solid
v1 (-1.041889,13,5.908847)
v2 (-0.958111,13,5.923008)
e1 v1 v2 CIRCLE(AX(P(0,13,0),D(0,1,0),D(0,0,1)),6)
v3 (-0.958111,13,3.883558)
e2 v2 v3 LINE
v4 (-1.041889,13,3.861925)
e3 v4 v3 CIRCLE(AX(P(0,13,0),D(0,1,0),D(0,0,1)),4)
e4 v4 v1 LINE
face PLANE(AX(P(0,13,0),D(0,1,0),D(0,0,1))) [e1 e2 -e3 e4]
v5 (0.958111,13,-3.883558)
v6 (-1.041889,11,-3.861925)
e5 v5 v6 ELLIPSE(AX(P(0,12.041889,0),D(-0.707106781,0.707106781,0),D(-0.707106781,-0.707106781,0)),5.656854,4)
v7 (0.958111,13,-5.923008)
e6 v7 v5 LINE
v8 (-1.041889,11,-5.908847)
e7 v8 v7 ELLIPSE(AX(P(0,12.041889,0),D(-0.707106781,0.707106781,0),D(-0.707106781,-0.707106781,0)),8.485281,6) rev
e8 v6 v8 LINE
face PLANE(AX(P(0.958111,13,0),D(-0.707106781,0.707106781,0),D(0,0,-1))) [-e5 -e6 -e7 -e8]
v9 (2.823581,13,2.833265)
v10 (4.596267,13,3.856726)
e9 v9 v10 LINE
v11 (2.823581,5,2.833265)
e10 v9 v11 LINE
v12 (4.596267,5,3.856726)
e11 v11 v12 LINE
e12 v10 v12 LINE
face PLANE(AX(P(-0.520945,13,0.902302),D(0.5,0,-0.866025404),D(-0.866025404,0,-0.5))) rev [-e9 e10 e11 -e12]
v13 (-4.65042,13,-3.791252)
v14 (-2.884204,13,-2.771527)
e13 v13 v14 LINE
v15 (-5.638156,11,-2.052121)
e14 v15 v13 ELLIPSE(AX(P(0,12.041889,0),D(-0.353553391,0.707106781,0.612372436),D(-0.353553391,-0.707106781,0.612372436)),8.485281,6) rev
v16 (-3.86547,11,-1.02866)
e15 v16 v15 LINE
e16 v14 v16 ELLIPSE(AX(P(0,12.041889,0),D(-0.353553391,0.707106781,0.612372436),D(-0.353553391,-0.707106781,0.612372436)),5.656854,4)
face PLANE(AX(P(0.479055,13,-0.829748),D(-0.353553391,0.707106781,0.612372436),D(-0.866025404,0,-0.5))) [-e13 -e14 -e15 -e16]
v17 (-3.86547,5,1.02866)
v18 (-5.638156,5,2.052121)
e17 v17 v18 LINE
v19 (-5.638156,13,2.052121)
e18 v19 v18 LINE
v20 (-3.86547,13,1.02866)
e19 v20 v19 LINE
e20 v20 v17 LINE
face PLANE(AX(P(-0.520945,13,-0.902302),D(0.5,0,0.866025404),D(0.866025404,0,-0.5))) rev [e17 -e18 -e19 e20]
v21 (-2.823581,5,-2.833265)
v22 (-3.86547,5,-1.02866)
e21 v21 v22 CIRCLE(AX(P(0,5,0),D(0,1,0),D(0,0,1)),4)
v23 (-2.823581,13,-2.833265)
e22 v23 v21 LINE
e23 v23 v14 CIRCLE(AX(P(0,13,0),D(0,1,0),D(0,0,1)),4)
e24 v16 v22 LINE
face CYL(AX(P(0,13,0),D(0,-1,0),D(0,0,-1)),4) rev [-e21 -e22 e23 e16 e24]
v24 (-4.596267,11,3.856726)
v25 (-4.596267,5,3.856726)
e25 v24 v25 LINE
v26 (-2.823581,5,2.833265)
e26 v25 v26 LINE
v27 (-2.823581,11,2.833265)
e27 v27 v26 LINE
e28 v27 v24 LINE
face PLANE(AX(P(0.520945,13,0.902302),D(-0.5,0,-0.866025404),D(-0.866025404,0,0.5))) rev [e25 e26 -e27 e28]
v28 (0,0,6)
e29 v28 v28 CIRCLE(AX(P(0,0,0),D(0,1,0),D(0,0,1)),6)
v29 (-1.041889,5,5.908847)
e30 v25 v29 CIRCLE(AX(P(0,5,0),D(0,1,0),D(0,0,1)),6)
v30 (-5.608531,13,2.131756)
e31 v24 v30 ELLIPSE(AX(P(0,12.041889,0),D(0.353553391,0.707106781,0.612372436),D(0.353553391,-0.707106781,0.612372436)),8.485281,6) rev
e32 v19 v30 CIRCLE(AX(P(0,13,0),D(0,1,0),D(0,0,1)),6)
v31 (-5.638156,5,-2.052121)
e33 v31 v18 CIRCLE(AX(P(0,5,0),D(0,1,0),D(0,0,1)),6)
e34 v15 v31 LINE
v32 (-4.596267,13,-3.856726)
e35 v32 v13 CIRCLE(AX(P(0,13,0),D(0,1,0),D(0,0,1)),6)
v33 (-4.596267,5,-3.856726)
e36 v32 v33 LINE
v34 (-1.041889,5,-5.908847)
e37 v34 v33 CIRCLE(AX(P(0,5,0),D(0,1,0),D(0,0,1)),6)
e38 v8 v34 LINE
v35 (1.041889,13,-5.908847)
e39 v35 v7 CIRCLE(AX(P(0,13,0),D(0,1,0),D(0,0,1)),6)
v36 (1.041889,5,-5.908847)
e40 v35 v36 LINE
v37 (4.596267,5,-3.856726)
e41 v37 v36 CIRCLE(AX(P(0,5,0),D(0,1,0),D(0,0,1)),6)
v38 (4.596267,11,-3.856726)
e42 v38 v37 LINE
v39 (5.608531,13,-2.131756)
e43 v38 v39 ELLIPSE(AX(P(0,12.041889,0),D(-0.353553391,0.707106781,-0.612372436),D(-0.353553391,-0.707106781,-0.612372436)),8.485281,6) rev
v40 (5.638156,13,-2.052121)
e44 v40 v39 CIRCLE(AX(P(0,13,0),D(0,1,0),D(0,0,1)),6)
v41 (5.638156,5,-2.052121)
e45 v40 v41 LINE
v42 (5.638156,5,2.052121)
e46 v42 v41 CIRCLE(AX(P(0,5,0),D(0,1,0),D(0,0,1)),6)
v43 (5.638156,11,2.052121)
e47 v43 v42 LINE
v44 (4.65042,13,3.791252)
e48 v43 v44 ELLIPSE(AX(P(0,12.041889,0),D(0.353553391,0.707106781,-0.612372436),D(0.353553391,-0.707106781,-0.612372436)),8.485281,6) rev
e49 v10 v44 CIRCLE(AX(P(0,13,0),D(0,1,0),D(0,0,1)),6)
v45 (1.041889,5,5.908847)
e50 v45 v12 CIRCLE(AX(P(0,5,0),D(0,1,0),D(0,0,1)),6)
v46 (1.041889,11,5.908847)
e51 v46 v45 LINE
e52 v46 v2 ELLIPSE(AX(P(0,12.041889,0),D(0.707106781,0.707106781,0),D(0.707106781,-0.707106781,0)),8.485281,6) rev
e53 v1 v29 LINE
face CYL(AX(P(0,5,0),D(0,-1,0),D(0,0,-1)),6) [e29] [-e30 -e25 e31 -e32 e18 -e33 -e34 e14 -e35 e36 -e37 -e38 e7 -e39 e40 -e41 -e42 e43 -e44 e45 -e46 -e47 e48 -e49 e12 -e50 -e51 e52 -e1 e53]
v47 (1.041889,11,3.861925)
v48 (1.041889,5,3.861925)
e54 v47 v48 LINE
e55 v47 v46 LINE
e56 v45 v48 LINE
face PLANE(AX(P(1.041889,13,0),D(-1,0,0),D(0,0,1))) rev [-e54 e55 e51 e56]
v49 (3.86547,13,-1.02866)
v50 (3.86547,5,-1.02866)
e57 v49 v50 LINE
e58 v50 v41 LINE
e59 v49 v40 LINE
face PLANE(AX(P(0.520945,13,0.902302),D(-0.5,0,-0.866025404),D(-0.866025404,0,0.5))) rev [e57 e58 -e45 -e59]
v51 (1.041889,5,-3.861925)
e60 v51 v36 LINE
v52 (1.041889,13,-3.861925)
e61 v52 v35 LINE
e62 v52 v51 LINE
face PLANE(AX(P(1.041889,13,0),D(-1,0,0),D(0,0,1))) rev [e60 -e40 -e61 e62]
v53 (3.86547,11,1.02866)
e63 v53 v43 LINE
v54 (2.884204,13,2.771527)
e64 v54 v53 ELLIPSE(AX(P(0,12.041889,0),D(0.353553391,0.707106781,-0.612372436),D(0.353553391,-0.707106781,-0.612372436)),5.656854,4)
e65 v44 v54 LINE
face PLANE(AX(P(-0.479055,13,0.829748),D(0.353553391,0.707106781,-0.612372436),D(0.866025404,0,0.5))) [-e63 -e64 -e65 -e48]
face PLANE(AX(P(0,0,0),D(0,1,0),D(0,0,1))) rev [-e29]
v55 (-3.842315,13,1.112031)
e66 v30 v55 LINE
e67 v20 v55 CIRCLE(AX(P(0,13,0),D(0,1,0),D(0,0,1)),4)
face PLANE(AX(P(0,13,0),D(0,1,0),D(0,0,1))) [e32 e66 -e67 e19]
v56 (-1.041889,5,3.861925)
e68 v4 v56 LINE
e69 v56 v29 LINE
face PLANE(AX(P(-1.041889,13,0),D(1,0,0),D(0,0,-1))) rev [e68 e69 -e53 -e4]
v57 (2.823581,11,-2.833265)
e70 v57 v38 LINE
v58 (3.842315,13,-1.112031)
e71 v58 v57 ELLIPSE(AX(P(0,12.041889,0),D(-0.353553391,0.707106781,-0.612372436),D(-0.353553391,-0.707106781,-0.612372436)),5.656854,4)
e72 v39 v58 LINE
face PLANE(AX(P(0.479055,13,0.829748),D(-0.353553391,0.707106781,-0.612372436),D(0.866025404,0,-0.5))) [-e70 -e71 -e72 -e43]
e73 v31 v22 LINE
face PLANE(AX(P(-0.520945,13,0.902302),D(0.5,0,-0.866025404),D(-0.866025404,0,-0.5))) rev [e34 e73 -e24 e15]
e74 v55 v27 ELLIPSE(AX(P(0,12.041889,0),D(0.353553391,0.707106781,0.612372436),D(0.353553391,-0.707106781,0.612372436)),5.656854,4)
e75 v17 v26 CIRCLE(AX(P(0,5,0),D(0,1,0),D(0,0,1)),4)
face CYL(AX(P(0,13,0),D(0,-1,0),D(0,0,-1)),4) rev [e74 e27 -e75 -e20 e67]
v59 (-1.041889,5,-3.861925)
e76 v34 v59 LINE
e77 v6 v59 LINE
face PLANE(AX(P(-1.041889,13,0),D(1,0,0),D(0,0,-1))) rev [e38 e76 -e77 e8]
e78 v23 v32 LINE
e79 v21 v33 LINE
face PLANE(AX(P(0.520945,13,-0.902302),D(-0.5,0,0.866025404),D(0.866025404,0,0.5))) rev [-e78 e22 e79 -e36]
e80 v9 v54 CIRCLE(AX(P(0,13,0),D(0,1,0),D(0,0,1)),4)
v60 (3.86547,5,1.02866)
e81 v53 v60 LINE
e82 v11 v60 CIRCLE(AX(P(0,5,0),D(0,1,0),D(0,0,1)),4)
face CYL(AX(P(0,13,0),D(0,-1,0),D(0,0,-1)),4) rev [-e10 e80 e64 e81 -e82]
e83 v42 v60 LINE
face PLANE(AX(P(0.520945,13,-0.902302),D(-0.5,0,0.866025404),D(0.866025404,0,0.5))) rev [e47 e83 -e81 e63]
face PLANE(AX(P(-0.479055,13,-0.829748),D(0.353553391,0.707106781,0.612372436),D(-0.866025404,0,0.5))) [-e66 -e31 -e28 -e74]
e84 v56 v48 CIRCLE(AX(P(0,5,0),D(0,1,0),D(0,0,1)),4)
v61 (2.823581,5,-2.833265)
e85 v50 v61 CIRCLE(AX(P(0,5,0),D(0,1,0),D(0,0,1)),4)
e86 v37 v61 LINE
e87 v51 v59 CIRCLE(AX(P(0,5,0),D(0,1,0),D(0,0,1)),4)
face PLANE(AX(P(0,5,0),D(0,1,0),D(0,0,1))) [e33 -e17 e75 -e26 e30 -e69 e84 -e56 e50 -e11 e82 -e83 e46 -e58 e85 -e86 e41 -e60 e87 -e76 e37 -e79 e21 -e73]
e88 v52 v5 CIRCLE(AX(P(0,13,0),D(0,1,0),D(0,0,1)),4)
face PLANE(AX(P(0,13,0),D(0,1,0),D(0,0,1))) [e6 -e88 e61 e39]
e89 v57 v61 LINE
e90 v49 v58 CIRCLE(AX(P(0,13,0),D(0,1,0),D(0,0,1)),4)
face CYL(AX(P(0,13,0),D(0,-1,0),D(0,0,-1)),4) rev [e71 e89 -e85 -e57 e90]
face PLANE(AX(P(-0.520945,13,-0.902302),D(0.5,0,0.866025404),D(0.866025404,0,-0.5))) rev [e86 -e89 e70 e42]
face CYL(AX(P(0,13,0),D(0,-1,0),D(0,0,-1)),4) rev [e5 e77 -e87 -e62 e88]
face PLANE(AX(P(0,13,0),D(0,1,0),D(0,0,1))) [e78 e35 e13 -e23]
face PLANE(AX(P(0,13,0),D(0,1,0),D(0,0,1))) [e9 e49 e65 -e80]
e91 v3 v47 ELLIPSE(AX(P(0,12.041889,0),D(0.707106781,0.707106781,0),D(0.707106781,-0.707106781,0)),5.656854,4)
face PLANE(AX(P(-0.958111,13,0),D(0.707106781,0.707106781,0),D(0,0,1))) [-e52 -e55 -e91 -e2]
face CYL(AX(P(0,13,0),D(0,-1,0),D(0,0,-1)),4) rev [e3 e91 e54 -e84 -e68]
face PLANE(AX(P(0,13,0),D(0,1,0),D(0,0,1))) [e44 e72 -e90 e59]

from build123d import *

# Parameters (mm, degrees)
SKETCH1_R           = 6
BOSS_EXTRUDE1_DEPTH = 5
BOSS_EXTRUDE3_DEPTH = 8
CHAMFER2_SIZE       = 2


with BuildPart() as part:
    # Sketch1 → Boss-Extrude1 (new body)
    with BuildSketch(Plane(origin=(0, 0, 0), x_dir=(1, 0, 0), z_dir=(0, 1, 0))):
        Circle(SKETCH1_R)
    extrude(amount=BOSS_EXTRUDE1_DEPTH)

    # Sketch5 → Boss-Extrude3 (add)
    with BuildSketch(Plane(origin=(0, 5, 0), x_dir=(1, 0, 0), z_dir=(0, 1, 0))):
        with BuildLine():
            ThreePointArc((5.638155725, 2.05212086), (5.196152423, 3), (4.596266659, 3.856725658))
            Line((4.596266659, 3.856725658), (2.823580901, 2.833265059))
            ThreePointArc((2.823580901, 2.833265059), (3.464101615, 2), (3.865469967, 1.028660261))
            Line((3.865469967, 1.028660261), (5.638155725, 2.05212086))
        make_face()
        with BuildLine():
            Line((1.041889066, 3.86192532), (1.041889066, 5.908846518))
            ThreePointArc((1.041889066, 5.908846518), (0, 6), (-1.041889066, 5.908846518))
            Line((-1.041889066, 5.908846518), (-1.041889066, 3.86192532))
            ThreePointArc((-1.041889066, 3.86192532), (0, 4), (1.041889066, 3.86192532))
        make_face()
        with BuildLine():
            ThreePointArc((4.596266659, -3.856725658), (5.196152423, -3), (5.638155725, -2.05212086))
            Line((5.638155725, -2.05212086), (3.865469967, -1.028660261))
            ThreePointArc((3.865469967, -1.028660261), (3.464101615, -2), (2.823580901, -2.833265059))
            Line((2.823580901, -2.833265059), (4.596266659, -3.856725658))
        make_face()
        with BuildLine():
            Line((-2.823580901, 2.833265059), (-4.596266659, 3.856725658))
            ThreePointArc((-4.596266659, 3.856725658), (-5.196152423, 3), (-5.638155725, 2.05212086))
            Line((-5.638155725, 2.05212086), (-3.865469967, 1.028660261))
            ThreePointArc((-3.865469967, 1.028660261), (-3.464101615, 2), (-2.823580901, 2.833265059))
        make_face()
        with BuildLine():
            ThreePointArc((-1.041889066, -5.908846518), (0, -6), (1.041889066, -5.908846518))
            Line((1.041889066, -5.908846518), (1.041889066, -3.86192532))
            ThreePointArc((1.041889066, -3.86192532), (0, -4), (-1.041889066, -3.86192532))
            Line((-1.041889066, -3.86192532), (-1.041889066, -5.908846518))
        make_face()
        with BuildLine():
            Line((-3.865469967, -1.028660261), (-5.638155725, -2.05212086))
            ThreePointArc((-5.638155725, -2.05212086), (-5.196152423, -3), (-4.596266659, -3.856725658))
            Line((-4.596266659, -3.856725658), (-2.823580901, -2.833265059))
            ThreePointArc((-2.823580901, -2.833265059), (-3.464101615, -2), (-3.865469967, -1.028660261))
        make_face()
    extrude(amount=BOSS_EXTRUDE3_DEPTH)

    # Chamfer2
    chamfer2_edges = [part.edges().sort_by_distance(p)[0] for p in [
        (1.041889066, 13, 4.885385919),
        (-3.70992378, 13, 3.344995359),
        (-4.751812846, 13, -1.54039056),
        (-1.041889066, 13, -4.885385919),
        (3.70992378, 13, -3.344995359),
        (4.751812846, 13, 1.54039056),
    ]]
    chamfer(chamfer2_edges, length=CHAMFER2_SIZE)


solid = part.part
